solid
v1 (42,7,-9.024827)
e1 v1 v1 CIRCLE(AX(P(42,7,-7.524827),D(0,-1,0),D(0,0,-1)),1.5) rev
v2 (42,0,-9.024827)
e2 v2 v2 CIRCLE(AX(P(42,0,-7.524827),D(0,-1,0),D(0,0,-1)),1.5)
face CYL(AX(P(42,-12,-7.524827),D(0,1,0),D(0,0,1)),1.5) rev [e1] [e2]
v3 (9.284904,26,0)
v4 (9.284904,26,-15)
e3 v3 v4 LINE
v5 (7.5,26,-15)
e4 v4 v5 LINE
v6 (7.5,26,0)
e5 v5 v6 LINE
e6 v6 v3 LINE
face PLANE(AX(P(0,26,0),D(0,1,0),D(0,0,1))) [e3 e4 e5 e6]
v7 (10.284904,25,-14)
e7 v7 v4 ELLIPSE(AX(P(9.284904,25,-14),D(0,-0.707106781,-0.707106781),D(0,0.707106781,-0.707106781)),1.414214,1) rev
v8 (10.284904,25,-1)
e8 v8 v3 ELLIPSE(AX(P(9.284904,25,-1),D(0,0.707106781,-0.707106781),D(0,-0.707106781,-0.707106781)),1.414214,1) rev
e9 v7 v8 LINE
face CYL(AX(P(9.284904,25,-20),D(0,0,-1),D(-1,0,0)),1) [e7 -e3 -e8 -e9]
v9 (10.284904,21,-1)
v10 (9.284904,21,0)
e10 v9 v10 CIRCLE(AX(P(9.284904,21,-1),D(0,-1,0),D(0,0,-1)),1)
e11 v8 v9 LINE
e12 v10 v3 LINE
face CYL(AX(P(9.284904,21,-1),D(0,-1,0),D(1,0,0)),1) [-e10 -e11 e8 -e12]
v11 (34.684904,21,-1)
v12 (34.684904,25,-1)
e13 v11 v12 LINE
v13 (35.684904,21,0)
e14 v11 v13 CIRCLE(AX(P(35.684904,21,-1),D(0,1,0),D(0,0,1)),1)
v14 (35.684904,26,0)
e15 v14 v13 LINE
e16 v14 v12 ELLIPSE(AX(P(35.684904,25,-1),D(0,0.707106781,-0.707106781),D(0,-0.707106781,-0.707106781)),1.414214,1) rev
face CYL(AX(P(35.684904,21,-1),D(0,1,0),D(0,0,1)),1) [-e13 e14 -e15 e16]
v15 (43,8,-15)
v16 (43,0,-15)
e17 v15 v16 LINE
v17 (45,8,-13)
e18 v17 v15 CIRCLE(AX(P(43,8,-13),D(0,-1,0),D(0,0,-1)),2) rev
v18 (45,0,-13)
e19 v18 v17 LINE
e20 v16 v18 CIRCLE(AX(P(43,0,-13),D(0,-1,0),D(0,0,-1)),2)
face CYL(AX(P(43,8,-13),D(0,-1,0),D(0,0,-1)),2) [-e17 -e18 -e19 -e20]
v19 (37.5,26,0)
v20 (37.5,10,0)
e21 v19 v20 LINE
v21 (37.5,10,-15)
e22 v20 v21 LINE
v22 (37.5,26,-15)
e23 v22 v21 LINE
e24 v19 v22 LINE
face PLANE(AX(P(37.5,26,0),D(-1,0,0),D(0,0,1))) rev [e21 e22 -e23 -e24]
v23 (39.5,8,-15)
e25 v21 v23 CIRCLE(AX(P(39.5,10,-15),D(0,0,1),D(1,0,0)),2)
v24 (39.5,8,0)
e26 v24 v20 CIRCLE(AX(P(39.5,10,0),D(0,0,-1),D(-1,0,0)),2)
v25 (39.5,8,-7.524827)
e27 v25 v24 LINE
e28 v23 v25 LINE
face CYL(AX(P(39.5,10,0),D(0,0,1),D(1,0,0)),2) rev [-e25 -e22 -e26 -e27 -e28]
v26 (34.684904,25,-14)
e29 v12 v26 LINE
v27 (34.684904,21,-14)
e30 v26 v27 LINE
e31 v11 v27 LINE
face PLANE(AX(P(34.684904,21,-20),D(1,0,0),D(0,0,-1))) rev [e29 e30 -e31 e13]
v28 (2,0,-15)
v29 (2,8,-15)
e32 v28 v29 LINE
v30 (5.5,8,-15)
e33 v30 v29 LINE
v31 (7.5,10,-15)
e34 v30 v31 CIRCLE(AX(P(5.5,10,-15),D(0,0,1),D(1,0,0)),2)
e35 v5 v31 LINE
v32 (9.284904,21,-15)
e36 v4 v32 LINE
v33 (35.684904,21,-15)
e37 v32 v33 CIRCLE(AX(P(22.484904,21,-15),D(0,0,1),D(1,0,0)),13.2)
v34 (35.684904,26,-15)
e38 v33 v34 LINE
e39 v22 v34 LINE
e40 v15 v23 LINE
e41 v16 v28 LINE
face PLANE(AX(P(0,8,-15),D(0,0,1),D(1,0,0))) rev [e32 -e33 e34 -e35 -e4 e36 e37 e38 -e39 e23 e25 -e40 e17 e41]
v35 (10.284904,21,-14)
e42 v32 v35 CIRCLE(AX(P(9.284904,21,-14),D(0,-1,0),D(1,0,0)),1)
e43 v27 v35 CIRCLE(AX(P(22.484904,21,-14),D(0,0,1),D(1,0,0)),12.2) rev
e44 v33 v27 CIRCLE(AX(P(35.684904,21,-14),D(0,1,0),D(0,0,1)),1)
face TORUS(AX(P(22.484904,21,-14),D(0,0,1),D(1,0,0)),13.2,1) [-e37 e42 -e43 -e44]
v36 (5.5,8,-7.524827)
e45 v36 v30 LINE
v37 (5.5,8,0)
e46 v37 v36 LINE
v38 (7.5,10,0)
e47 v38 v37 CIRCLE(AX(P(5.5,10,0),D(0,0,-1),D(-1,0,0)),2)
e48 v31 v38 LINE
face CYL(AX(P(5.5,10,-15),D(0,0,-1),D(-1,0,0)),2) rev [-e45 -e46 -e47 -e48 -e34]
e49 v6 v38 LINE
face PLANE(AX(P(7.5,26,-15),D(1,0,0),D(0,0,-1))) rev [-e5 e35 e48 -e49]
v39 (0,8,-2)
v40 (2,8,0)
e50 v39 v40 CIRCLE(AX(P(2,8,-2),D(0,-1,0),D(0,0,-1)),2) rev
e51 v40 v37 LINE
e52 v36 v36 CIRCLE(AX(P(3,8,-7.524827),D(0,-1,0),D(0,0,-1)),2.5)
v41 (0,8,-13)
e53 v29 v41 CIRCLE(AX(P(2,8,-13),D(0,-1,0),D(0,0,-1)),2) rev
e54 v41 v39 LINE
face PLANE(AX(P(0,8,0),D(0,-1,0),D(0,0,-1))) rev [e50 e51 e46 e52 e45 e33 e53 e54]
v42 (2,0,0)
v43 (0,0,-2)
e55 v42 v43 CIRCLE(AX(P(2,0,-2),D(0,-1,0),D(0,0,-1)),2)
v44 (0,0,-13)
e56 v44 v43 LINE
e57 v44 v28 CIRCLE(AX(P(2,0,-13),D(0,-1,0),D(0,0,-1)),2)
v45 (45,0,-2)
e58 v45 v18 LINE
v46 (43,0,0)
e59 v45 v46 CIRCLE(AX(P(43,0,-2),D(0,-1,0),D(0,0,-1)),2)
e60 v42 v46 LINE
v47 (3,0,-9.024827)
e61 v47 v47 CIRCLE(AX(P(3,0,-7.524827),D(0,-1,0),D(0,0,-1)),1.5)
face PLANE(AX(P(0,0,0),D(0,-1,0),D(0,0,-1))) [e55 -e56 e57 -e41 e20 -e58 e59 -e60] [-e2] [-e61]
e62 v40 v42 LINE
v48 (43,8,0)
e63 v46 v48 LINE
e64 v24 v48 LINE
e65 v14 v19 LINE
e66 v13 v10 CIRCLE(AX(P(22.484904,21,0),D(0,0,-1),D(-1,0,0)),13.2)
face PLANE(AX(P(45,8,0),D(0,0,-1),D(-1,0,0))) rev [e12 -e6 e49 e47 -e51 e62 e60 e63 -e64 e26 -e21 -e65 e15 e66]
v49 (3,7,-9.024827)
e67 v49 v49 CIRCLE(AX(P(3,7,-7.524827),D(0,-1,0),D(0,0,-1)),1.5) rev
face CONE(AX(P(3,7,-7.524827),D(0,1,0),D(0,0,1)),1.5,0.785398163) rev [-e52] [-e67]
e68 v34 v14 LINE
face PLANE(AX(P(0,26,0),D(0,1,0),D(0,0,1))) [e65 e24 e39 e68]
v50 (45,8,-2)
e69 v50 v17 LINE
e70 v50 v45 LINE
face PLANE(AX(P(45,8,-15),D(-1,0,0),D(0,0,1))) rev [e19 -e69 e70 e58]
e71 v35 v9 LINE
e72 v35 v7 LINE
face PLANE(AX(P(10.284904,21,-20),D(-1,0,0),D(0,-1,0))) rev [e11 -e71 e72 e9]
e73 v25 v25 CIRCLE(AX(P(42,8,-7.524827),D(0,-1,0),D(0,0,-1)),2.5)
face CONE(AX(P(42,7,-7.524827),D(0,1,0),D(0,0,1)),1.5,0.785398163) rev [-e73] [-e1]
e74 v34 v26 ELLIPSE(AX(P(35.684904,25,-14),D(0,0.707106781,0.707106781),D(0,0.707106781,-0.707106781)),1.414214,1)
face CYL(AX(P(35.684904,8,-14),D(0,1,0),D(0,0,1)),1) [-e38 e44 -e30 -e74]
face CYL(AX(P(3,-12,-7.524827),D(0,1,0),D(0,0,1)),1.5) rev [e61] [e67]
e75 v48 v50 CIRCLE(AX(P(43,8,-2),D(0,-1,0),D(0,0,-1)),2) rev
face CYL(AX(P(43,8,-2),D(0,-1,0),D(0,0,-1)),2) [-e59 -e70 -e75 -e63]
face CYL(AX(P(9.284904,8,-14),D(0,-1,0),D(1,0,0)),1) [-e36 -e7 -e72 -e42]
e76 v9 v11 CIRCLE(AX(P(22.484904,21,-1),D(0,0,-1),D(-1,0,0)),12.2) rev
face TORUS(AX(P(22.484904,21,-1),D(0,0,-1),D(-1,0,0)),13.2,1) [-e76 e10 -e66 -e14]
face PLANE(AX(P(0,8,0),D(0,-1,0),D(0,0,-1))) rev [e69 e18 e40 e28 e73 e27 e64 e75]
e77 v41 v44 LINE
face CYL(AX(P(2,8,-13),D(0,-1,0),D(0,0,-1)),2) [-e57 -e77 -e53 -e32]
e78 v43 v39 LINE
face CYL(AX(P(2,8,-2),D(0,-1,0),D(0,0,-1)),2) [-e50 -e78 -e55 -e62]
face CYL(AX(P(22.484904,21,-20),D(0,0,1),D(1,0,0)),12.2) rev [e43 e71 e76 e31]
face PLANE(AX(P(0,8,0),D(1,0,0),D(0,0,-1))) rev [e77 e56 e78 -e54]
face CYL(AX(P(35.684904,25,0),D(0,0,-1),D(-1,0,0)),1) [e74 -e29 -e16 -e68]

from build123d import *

# Parameters (mm, degrees)
SKETCH1_W           = 45
SKETCH1_H           = 15
BOSS_EXTRUDE1_DEPTH = 8
SKETCH2_W           = 30
SKETCH2_H           = 15
BOSS_EXTRUDE2_DEPTH = 18
FILLET1_R           = 2
SKETCH3_R           = 1.5
CUT_EXTRUDE1_DEPTH  = 20
CHAMFER1_SIZE       = 1
SKETCH13_R          = 12.2
CUT_EXTRUDE4_DEPTH  = 20
SKETCH14_W          = 24.4
SKETCH14_H          = 5
CUT_EXTRUDE5_DEPTH  = 20
FILLET4_R           = 1


with BuildPart() as part:
    # Sketch1 → Boss-Extrude1 (new body)
    with BuildSketch(Plane(origin=(0, 0, 0), x_dir=(1, 0, 0), z_dir=(0, 1, 0))):
        with Locations((22.5, 7.5)):
            Rectangle(SKETCH1_W, SKETCH1_H)
    extrude(amount=BOSS_EXTRUDE1_DEPTH)

    # Sketch2 → Boss-Extrude2 (add)
    with BuildSketch(Plane(origin=(0, 8, 0), x_dir=(1, 0, 0), z_dir=(0, 1, 0))):
        with Locations((22.5, 7.5)):
            Rectangle(SKETCH2_W, SKETCH2_H)
    extrude(amount=BOSS_EXTRUDE2_DEPTH)

    # Fillet1
    fillet1_edges = [part.edges().sort_by_distance(p)[0] for p in [
        (7.5, 8, -7.5),
        (37.5, 8, -7.5),
        (0, 4, 0),
        (0, 4, -15),
        (45, 4, -15),
        (45, 4, 0),
    ]]
    fillet(fillet1_edges, radius=FILLET1_R)

    # Sketch3 → Cut-Extrude1 (cut)
    with BuildSketch(Plane(origin=(0, 8, 0), x_dir=(1, 0, 0), z_dir=(0, 1, 0))):
        with Locations(Location((3, 7.524826623, 0), (0, 0, 270))):
            Circle(SKETCH3_R)
        with Locations(Location((42, 7.524826623, 0), (0, 0, 270))):
            Circle(SKETCH3_R)
    extrude(amount=-CUT_EXTRUDE1_DEPTH, mode=Mode.SUBTRACT)

    # Chamfer1
    chamfer1_edges = [part.edges().sort_by_distance(p)[0] for p in [
        (3, 8, -9.024826623),
        (42, 8, -9.024826623),
    ]]
    chamfer(chamfer1_edges, length=CHAMFER1_SIZE - 0.0001)  # a hair under: the kernel refuses the full size

    # Sketch13 → Cut-Extrude4 (cut)
    with BuildSketch(Plane.XY):
        with Locations((22.484903529, 21)):
            Circle(SKETCH13_R)
    extrude(amount=-CUT_EXTRUDE4_DEPTH, mode=Mode.SUBTRACT)

    # Sketch14 → Cut-Extrude5 (cut)
    with BuildSketch(Plane.XY):
        with Locations((22.484903529, 23.5)):
            Rectangle(SKETCH14_W, SKETCH14_H)
    extrude(amount=-CUT_EXTRUDE5_DEPTH, mode=Mode.SUBTRACT)

    # Fillet4
    fillet4_edges = [part.edges().sort_by_distance(p)[0] for p in [
        (22.484903529, 8.8, 0),
        (22.484903529, 8.8, -15),
        (10.284903529, 23.5, -15),
        (10.284903529, 26, -7.5),
        (34.684903529, 23.5, -15),
        (34.684903529, 26, -7.5),
        (10.284903529, 23.5, 0),
        (34.684903529, 23.5, 0),
    ]]
    fillet(fillet4_edges, radius=FILLET4_R)


solid = part.part
